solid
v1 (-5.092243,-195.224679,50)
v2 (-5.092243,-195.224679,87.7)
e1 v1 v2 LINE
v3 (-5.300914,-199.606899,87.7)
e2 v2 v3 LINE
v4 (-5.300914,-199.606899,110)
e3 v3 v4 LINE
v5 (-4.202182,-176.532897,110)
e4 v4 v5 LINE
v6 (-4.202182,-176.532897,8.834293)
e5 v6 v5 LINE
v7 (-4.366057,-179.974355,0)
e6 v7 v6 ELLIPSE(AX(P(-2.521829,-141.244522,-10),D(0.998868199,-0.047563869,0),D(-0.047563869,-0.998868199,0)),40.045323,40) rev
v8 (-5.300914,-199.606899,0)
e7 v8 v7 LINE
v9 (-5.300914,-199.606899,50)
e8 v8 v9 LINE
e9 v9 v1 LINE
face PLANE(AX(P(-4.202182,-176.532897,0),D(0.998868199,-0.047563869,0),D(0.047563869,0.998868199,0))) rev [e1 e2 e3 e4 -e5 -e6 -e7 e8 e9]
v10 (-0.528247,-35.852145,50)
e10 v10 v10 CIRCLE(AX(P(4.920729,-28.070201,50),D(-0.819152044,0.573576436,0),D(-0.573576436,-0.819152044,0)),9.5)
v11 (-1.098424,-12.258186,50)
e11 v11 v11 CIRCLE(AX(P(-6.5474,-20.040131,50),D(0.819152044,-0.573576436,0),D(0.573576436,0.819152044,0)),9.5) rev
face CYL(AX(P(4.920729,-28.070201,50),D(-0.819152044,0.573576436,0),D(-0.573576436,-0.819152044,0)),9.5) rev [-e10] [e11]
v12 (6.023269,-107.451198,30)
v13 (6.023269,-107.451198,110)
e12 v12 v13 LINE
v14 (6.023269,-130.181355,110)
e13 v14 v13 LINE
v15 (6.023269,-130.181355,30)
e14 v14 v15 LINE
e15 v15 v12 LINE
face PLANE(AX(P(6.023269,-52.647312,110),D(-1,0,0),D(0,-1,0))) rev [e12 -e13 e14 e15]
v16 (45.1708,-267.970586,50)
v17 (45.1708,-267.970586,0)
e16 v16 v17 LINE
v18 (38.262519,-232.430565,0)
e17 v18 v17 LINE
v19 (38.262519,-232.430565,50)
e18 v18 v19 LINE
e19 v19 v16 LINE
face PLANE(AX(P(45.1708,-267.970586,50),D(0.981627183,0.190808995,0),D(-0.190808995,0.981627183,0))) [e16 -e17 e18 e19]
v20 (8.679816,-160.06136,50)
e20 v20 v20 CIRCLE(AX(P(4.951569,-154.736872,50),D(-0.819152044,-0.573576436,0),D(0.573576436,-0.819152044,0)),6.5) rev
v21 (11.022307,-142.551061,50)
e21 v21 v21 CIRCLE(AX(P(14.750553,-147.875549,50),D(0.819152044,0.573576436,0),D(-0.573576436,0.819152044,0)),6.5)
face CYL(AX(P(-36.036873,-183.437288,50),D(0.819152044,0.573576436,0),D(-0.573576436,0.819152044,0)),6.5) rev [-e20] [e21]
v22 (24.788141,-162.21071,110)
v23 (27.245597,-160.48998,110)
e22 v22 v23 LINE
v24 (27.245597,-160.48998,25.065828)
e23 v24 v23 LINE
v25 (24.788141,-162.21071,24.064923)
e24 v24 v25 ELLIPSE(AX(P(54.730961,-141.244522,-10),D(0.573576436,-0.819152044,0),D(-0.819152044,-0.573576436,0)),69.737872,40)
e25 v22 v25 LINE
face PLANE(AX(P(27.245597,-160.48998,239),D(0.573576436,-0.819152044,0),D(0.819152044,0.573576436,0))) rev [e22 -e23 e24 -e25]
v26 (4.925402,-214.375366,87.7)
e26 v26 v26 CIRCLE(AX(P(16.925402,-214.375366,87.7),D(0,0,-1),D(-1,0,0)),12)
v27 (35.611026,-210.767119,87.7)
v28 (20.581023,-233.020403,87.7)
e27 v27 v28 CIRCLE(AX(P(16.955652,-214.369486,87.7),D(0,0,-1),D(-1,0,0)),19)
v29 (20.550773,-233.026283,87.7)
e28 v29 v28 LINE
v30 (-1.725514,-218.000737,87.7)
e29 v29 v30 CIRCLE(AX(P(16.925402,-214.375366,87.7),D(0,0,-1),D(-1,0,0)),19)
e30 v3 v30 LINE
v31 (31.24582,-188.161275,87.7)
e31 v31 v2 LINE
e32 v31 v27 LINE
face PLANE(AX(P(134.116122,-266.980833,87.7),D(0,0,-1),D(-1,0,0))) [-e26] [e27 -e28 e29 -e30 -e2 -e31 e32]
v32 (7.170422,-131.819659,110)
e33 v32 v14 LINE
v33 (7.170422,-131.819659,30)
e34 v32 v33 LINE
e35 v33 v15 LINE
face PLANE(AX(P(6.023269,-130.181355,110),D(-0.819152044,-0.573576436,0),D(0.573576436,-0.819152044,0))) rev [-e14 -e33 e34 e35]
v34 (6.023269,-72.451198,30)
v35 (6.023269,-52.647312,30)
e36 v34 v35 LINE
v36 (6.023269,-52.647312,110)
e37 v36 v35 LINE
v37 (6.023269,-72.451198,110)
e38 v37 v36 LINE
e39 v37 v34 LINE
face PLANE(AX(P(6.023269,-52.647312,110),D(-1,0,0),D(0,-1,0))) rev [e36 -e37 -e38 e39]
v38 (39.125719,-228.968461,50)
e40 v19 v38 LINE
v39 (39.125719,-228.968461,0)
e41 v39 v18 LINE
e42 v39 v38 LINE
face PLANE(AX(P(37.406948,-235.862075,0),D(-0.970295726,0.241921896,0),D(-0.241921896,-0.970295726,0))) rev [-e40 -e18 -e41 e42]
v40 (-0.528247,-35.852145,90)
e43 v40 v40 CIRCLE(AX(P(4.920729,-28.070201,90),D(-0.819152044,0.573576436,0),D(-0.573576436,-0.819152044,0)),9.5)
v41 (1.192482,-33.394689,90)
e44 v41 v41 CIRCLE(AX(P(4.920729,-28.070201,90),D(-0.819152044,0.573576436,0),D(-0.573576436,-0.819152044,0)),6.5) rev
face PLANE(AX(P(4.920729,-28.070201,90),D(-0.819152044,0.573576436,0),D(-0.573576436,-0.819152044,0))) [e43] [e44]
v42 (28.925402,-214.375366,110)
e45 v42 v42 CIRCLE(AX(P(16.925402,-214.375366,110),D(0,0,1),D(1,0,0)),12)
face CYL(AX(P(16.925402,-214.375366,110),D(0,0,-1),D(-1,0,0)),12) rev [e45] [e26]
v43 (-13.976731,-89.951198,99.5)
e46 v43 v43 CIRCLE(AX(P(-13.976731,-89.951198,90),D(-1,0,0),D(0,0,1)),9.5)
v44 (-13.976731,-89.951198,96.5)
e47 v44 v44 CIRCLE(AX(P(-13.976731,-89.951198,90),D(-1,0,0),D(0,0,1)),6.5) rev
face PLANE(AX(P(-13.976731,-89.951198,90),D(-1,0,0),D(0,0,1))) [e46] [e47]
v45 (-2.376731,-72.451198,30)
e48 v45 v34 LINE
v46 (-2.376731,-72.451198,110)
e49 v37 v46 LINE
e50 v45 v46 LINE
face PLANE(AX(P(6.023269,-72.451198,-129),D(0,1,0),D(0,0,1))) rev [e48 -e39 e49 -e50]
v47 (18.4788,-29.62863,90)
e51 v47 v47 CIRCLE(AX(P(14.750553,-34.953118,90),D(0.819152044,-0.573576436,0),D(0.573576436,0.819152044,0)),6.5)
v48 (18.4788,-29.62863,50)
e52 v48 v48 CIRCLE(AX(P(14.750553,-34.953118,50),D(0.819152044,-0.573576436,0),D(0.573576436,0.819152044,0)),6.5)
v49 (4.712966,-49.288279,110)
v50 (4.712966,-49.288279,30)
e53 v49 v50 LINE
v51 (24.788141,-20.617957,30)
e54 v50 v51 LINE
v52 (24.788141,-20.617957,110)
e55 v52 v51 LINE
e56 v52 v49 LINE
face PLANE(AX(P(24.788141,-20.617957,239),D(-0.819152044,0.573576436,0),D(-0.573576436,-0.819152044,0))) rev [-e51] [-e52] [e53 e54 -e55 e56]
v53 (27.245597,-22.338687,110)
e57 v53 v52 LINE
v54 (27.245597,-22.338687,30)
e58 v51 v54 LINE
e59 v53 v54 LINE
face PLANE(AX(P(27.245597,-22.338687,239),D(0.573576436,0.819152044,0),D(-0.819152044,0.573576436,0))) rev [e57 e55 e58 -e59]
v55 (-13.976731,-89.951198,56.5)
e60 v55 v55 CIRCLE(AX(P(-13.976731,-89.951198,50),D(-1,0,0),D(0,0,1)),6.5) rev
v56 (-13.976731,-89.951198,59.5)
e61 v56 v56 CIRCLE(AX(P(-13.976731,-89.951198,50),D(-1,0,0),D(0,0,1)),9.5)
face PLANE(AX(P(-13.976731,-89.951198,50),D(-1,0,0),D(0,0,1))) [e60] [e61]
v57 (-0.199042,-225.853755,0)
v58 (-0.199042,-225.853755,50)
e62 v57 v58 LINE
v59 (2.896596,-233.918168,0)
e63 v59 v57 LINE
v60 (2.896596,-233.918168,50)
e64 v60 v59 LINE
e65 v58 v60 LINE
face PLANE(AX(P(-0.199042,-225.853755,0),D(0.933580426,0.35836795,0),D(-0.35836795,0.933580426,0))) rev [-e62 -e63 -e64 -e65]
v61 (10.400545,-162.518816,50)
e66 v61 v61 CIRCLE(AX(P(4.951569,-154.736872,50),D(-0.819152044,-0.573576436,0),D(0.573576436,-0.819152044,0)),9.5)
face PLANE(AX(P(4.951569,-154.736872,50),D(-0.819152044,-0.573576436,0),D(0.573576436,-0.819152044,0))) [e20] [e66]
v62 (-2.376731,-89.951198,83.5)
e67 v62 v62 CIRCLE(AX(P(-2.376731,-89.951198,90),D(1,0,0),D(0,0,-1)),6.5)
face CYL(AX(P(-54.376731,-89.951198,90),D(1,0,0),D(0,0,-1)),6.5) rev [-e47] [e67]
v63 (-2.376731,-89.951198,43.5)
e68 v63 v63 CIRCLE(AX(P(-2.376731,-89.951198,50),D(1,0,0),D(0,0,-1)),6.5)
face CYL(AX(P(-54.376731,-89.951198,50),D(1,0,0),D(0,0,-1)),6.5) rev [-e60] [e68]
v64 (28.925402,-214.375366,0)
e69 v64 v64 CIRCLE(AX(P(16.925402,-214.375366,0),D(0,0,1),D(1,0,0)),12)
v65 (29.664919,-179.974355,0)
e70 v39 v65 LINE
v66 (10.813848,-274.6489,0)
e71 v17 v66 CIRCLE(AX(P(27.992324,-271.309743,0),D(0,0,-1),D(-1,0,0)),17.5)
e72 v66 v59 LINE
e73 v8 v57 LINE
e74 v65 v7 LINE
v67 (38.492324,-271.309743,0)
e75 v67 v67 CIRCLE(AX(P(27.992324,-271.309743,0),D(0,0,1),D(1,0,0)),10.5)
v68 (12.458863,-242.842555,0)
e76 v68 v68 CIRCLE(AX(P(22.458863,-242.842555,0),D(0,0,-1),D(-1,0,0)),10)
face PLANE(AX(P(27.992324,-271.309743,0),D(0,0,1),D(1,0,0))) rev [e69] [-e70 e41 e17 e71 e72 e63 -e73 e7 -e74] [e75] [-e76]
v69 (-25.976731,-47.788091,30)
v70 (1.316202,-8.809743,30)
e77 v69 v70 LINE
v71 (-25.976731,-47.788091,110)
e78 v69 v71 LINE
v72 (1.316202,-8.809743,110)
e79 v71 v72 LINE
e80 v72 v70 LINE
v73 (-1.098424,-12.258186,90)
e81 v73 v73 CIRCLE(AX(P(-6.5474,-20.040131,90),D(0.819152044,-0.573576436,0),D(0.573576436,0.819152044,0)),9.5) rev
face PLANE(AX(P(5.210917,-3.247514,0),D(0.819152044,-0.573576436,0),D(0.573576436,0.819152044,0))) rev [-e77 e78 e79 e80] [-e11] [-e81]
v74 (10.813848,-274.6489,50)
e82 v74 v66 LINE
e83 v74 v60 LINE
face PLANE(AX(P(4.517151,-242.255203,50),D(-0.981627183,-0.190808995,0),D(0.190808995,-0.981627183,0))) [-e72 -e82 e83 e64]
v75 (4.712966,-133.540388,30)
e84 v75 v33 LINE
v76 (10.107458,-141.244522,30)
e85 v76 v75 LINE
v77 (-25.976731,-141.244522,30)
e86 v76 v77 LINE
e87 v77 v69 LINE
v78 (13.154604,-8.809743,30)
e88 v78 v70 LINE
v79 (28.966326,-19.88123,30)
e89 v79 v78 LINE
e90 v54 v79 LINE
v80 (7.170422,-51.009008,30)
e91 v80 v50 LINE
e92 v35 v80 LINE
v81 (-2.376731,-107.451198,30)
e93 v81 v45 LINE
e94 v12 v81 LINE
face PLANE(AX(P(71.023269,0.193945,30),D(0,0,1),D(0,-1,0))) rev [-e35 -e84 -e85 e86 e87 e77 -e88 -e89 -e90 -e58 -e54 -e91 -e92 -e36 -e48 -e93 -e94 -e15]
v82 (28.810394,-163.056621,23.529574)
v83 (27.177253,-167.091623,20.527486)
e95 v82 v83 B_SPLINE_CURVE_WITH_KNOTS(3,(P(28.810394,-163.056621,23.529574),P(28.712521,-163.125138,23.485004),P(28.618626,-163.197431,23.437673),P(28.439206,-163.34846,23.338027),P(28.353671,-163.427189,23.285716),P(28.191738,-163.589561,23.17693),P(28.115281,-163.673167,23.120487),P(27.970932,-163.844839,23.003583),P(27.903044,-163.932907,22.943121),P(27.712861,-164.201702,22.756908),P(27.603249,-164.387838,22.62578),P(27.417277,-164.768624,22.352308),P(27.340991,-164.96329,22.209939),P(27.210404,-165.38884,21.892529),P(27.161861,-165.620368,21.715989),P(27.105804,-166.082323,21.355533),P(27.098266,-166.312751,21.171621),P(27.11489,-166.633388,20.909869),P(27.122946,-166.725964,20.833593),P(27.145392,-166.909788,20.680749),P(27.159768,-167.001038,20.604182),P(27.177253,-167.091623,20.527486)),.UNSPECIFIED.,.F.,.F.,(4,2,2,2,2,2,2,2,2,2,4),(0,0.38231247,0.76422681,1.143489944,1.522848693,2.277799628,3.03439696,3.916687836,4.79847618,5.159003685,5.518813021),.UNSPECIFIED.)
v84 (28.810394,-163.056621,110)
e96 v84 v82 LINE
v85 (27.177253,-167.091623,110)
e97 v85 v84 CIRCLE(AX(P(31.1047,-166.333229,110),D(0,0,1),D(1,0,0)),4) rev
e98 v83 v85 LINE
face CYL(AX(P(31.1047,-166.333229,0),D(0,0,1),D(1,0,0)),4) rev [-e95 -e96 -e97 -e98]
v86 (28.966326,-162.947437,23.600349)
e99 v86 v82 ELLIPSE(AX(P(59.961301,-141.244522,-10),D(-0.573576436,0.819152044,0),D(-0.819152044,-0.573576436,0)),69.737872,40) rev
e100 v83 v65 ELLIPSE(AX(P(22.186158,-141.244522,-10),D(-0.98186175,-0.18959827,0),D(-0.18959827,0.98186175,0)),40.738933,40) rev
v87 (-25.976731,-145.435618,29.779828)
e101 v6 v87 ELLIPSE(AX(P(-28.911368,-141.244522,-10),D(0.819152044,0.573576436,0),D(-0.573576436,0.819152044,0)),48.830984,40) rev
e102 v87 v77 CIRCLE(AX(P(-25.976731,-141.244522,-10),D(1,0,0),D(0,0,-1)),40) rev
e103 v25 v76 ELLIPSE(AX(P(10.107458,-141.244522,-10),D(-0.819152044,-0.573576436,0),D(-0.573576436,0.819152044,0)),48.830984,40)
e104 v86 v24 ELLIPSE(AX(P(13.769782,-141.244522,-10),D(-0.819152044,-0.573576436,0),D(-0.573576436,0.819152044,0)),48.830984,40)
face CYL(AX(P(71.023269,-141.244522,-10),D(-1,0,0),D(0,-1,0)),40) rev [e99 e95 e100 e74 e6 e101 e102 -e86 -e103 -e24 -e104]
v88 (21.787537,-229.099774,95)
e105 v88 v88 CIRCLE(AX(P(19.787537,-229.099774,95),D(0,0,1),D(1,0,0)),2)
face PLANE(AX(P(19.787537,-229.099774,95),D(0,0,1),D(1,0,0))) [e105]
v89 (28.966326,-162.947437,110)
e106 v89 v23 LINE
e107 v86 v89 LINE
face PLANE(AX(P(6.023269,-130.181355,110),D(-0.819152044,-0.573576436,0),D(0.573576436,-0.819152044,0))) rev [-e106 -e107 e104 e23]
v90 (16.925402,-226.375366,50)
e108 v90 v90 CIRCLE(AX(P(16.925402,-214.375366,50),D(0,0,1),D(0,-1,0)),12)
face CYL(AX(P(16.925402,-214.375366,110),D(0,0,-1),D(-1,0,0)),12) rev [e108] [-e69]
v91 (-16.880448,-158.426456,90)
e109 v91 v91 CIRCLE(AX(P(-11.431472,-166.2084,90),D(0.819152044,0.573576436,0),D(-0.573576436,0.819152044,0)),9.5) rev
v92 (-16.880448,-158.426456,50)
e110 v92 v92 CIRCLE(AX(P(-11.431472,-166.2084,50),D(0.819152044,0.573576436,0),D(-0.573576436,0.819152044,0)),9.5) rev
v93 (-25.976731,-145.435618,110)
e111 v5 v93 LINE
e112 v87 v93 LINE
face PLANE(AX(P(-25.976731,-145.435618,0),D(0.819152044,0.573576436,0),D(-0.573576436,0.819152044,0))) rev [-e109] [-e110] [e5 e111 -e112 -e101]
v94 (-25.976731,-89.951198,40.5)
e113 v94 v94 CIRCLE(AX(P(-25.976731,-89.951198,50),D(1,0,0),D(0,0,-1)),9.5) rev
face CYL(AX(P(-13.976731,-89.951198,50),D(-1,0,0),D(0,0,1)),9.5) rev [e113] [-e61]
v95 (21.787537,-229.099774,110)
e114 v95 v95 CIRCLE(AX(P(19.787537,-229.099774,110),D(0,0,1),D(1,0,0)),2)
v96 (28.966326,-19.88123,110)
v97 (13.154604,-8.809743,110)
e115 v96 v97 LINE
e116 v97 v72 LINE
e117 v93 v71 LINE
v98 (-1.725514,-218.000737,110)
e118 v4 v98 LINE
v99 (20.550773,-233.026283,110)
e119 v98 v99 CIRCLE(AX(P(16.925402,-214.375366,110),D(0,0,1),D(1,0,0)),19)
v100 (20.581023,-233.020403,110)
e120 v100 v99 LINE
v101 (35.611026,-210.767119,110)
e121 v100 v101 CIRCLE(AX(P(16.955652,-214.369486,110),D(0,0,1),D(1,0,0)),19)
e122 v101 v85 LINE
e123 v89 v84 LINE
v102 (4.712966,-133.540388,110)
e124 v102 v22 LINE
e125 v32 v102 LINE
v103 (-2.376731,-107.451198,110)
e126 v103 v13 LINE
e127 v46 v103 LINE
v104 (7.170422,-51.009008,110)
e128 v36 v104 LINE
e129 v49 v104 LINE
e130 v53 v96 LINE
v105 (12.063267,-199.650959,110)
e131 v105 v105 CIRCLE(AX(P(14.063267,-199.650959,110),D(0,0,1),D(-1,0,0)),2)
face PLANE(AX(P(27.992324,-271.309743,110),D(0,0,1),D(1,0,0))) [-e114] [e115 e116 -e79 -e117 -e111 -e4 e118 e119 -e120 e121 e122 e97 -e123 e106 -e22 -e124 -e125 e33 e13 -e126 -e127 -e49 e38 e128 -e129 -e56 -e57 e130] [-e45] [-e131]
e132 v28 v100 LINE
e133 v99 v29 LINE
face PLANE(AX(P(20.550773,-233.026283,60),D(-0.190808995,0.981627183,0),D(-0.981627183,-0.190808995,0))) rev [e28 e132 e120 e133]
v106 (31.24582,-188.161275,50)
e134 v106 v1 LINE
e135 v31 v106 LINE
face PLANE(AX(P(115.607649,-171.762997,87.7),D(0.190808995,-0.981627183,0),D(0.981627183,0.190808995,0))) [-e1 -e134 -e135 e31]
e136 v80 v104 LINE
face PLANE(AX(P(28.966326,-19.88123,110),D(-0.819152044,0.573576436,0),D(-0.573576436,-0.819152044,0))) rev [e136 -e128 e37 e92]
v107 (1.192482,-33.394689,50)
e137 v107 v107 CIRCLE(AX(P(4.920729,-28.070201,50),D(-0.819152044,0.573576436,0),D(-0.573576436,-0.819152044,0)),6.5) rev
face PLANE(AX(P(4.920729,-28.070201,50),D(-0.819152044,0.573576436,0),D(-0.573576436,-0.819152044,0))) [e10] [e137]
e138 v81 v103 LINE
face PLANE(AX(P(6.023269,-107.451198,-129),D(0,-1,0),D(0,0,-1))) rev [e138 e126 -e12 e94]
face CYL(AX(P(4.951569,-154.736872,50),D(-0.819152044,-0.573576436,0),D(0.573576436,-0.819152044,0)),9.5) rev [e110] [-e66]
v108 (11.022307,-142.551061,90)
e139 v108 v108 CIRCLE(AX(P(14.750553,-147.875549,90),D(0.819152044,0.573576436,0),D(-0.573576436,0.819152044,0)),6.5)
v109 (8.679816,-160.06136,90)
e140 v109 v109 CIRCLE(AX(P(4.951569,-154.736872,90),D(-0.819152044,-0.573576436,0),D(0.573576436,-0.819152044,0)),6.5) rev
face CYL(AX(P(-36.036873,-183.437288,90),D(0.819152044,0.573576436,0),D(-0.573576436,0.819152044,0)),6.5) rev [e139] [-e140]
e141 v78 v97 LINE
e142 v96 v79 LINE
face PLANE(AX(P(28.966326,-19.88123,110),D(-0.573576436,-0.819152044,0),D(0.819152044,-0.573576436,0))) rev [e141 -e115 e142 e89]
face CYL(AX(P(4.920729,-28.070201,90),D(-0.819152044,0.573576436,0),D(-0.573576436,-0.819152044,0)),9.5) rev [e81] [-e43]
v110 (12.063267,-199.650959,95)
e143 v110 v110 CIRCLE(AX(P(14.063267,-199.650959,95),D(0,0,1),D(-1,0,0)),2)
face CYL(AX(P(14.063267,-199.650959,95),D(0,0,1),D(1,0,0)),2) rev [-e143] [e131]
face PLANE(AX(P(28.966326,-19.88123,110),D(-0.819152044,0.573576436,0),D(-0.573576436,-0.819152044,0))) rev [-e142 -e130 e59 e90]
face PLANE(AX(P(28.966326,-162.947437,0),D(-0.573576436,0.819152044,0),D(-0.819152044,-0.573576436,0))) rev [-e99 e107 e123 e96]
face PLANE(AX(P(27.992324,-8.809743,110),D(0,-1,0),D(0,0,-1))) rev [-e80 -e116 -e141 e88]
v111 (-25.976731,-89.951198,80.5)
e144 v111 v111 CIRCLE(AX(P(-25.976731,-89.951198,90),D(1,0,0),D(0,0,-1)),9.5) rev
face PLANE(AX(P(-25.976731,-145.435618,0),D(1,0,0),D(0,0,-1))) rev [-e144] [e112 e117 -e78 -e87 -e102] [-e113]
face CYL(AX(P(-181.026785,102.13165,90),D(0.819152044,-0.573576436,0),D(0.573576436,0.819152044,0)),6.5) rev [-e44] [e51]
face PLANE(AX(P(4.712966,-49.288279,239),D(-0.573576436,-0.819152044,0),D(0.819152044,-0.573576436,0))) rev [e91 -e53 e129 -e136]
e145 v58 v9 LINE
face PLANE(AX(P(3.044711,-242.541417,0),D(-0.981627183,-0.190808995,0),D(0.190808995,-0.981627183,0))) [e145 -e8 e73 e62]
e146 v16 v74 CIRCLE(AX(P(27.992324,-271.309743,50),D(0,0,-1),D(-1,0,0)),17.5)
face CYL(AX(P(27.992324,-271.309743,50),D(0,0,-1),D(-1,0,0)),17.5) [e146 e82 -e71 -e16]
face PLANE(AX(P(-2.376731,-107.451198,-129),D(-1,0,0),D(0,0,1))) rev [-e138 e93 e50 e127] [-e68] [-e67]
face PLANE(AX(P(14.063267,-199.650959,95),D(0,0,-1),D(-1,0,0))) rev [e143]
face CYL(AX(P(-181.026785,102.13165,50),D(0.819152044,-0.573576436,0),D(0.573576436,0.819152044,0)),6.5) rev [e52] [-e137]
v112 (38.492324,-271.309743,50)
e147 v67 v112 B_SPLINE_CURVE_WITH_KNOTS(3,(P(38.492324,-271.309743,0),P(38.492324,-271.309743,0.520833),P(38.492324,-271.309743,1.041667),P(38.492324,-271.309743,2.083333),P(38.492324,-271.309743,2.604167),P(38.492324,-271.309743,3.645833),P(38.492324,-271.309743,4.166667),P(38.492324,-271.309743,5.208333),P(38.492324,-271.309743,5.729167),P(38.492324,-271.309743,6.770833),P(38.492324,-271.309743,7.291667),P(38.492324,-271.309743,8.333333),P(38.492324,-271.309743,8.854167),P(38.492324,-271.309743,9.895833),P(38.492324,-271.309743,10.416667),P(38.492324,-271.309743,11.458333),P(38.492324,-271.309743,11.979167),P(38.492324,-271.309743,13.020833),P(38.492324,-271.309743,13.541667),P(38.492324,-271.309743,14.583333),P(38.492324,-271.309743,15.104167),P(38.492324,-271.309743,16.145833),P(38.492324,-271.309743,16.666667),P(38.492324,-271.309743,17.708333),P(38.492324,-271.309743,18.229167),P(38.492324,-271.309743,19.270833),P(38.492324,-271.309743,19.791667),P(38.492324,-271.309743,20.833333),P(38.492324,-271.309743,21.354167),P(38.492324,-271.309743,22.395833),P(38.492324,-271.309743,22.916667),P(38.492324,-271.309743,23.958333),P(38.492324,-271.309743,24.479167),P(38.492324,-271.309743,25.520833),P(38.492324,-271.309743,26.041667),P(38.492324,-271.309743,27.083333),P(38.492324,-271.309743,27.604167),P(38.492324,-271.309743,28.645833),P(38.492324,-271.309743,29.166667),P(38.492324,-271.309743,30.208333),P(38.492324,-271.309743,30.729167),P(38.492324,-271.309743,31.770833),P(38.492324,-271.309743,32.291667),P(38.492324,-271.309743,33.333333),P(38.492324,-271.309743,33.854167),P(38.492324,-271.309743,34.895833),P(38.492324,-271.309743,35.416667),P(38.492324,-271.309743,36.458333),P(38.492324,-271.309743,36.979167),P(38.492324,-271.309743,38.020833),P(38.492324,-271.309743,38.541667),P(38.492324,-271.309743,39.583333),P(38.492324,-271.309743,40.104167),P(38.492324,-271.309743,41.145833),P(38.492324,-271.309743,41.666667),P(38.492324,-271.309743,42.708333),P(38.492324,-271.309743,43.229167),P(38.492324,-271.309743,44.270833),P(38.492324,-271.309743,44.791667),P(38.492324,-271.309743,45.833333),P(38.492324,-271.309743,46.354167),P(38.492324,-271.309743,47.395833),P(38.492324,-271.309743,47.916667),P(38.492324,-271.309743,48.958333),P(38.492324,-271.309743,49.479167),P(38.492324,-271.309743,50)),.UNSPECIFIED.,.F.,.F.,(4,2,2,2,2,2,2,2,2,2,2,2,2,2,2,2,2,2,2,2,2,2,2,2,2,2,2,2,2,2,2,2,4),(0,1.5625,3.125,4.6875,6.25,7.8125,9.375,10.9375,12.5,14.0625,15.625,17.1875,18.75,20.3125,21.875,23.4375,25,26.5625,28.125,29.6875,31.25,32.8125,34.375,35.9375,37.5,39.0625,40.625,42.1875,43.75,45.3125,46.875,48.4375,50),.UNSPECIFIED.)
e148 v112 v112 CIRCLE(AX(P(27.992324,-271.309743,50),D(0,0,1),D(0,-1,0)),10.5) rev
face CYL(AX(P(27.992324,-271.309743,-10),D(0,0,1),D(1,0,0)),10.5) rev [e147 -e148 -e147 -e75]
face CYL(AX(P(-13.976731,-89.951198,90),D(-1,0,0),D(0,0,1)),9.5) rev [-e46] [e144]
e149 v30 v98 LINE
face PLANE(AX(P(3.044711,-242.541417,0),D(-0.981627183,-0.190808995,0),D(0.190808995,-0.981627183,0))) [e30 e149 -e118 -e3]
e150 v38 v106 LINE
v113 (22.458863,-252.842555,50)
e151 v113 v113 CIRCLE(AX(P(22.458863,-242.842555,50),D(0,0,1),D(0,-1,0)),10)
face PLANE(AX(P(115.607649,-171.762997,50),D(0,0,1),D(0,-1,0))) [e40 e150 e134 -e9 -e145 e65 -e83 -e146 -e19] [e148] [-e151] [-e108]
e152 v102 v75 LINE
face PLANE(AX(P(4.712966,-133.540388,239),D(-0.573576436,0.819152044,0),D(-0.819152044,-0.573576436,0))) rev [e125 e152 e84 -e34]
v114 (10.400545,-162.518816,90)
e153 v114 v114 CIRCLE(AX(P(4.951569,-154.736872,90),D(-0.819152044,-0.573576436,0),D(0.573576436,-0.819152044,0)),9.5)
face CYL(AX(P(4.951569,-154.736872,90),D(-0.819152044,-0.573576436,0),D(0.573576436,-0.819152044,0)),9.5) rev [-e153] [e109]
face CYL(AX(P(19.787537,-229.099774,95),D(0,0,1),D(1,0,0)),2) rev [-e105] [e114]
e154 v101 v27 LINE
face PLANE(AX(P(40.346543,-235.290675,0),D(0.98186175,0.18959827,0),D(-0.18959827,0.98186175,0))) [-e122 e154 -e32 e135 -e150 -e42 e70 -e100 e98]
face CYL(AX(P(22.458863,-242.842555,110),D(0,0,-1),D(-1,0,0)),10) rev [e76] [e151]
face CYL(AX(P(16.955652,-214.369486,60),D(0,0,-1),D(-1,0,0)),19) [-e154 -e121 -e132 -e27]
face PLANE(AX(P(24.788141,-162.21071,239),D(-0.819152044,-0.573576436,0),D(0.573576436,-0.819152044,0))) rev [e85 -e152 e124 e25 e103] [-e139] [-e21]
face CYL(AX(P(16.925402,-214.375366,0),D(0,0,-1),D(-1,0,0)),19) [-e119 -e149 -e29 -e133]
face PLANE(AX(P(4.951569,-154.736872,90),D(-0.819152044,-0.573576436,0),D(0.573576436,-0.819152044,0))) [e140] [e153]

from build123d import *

# Parameters (mm, degrees)
SKETCH_1_R                = 12.000000000000052
EXTRUDE_1_DEPTH           = 110
SKETCH_79_R               = 10.500000000000002
CUT_EXTRUDE_45_DEPTH      = 119.99999999999999
EXTRUDE_2_DEPTH           = 110
CUT_EXTRUDE_46_DEPTH      = 89
CUT_EXTRUDE_46_DEPTH_BACK = 89
CUT_EXTRUDE_48_DEPTH      = 239.00000000000009
CUT_EXTRUDE_49_DEPTH      = 239.00000000000009
SKETCH_93_R               = 6.500000000000002
SKETCH_93_R_2             = 6.500000000000001
CUT_EXTRUDE_50_DEPTH      = 239.00000000000009
SKETCH_94_R               = 9.499999999999995
SKETCH_94_R_2             = 9.500000000000002
CUT_EXTRUDE_51_DEPTH      = 20
SKETCH_95_R               = 6.500000000000003
CUT_EXTRUDE_52_DEPTH      = 62.00000000000001
SKETCH_96_R               = 9.50000000000001
CUT_EXTRUDE_53_DEPTH      = 26
SKETCH_97_R               = 6.500000000000003
CUT_EXTRUDE_54_DEPTH      = 52.00000000000001
CUT_EXTRUDE_56_DEPTH      = 30
CHAMFER_1_SIZE            = 15
CHAMFER_1_SIZE2           = 6.994614872324999
CHAMFER_2_SIZE            = 17
CHAMFER_2_SIZE2           = 2.99755867204391
CUT_EXTRUDE_57_DEPTH      = 99.99999999999999
CUT_EXTRUDE_61_DEPTH      = 311.8166526922088
CUT_EXTRUDE_62_DEPTH      = 50
FILLET_3_R                = 19
EXTRUDE_3_DEPTH           = 50
SKETCH_107_R              = 2.0000000000000036
SKETCH_107_R_2            = 2.0000000000000027
CUT_EXTRUDE_63_DEPTH      = 15
EXTRUDE_4_DEPTH           = 80
SKETCH_109_R              = 6.500000000000003
CUT_EXTRUDE_64_DEPTH      = 80
SKETCH_110_R              = 9.5
SKETCH_110_R_2            = 9.499999999999993
CUT_EXTRUDE_65_DEPTH      = 18
FILLET_5_R                = 40
CUT_EXTRUDE_66_DEPTH      = 313.378967275511
CUT_EXTRUDE_67_DEPTH      = 313.378967275511
SKETCH_113_R              = 10.000000000000004
CUT_EXTRUDE_68_DEPTH      = 313.378967275511
CUT_EXTRUDE_69_DEPTH      = 304.118160452512
CUT_EXTRUDE_70_DEPTH      = 313.378967275511
FILLET_6_R                = 4


with BuildPart() as part:
    # 草图1 → 拉伸1 (new body)
    with BuildSketch(Plane.XY):
        with BuildLine():
            Line((-28.976730988546294, -151.6118545806237), (-4.886520661802549, -186.0162404407615))
            Line((-4.886520661802549, -186.0162404407615), (12.286288922085955, -274.3626869510514))
            ThreePointArc((12.286288922085955, -274.3626869510514), (31.04526778327322, -287.0157779601894), (43.69835879241124, -268.25679909900214))
            Line((43.69835879241124, -268.25679909900214), (21.02326901145373, -151.6035749038858))
            Line((21.02326901145373, -151.6035749038858), (6.0232690114537295, -130.18135480275456))
            Line((6.0232690114537295, -130.18135480275456), (6.023269011453701, -52.647312191388025))
            Line((6.023269011453701, -52.647312191388025), (28.96632646549536, -19.88123041982822))
            Line((28.96632646549536, -19.88123041982822), (0.2960049153805317, 0.19394485245823218))
            Line((0.2960049153805317, 0.19394485245823218), (-28.976730988546297, -41.61185458062371))
            Line((-28.976730988546297, -41.61185458062371), (-28.976730988546294, -151.6118545806237))
        make_face()
        with Locations((16.925402125409377, -214.37536638506216)):
            Circle(SKETCH_1_R, mode=Mode.SUBTRACT)
    extrude(amount=EXTRUDE_1_DEPTH)

    # 草图79 → 切除-拉伸45 (cut)
    with BuildSketch(Plane.XY.offset(110)):
        with Locations((27.992323857248596, -271.30974302502676)):
            Circle(SKETCH_79_R)
    extrude(amount=-CUT_EXTRUDE_45_DEPTH, mode=Mode.SUBTRACT)

    # 草图84 → 拉伸2 (add)
    with BuildSketch(Plane.XY.offset(110)):
        Polygon((33.778866566137545, -180.53953408076273), (44.27305222911856, -234.52743907759367), (37.4016619449849, -235.8631020452294), (21.02326901145373, -151.6035749038858), (30.894607438439245, -165.70130720226237), align=None)
        Polygon((5.989592074660172, -241.96898989727845), (3.0447105243171766, -242.54141688340806), (-9.117094273367561, -179.974355170029), (-4.886520661802549, -186.0162404407615), (-4.1690194468529445, -189.7074641975933), align=None)
    extrude(amount=-EXTRUDE_2_DEPTH)

    # 草图87 → 切除-拉伸46 (cut, two sides: drawn at the far end of the back side and taken through both)
    with BuildSketch(Plane(origin=(-8.137997067664443, -1.5818663857744057, 0), x_dir=(0, 0, -1), z_dir=(0.9816271834476652, 0.1908089953765384, 0)).offset(-CUT_EXTRUDE_46_DEPTH_BACK)):
        Polygon((-87.7, -287.6662060810232), (-87.7, -190.66620608102318), (-49.99999999999997, -190.66620608102318), (-49.999999999999964, -287.6662060810232), align=None)
    extrude(amount=CUT_EXTRUDE_46_DEPTH + CUT_EXTRUDE_46_DEPTH_BACK, mode=Mode.SUBTRACT)

    # 草图91 → 切除-拉伸48 (cut)
    with BuildSketch(Plane(origin=(0, 0, 0), x_dir=(-1, 0, 0), z_dir=(0, 0, -1))):
        Polygon((-27.245597156442233, -22.338686552695204), (-24.78814102357525, -20.61795724364208), (-4.712965751288797, -49.288278793756916), (-7.17042188415578, -51.00900810281004), align=None)
        Polygon((-7.1704218841557825, -131.81965889133255), (-27.24559715644222, -160.48998044144736), (-24.788141023575246, -162.21070975050048), (-4.712965751288817, -133.54038820038565), align=None)
    extrude(amount=-CUT_EXTRUDE_48_DEPTH, mode=Mode.SUBTRACT)

    # 草图92 → 切除-拉伸49 (cut)
    with BuildSketch(Plane.XY.offset(110)):
        Polygon((6.0232690114537295, -72.45119809723869), (-2.3767309885462713, -72.45119809723869), (-2.3767309885462713, -107.45119809723869), (6.023269011453735, -107.45119809723869), align=None)
    extrude(amount=-CUT_EXTRUDE_49_DEPTH, mode=Mode.SUBTRACT)

    # 草图93 → 切除-拉伸50 (cut)
    with BuildSketch(Plane(origin=(26.320363423382695, -18.42971687747145, 0), x_dir=(0, 0, -1), z_dir=(0.819152044288995, -0.5735764363510417, 0))):
        with Locations(Location((-90, -20.171348233123165, 0), (0, 0, 90))):
            Circle(SKETCH_93_R)
        with Locations(Location((-49.99999999999999, -20.171348233123165, 0), (0, 0, 90))):
            Circle(SKETCH_93_R_2)
    extrude(amount=-CUT_EXTRUDE_50_DEPTH, mode=Mode.SUBTRACT)

    # 草图94 → 切除-拉伸51 (cut)
    with BuildSketch(Plane(origin=(0.1074980061348375, -0.07527091423812592, 0), x_dir=(0, 0, 1), z_dir=(-0.819152044288995, 0.5735764363510416, 0))):
        with Locations(Location((90, -20.171348233123137, 0), (0, 0, 270))):
            Circle(SKETCH_94_R)
        with Locations(Location((49.99999999999999, -20.171348233123467, 0), (0, 0, 270))):
            Circle(SKETCH_94_R_2)
    extrude(amount=-CUT_EXTRUDE_51_DEPTH, mode=Mode.SUBTRACT)

    # 草图95 → 切除-拉伸52 (cut)
    with BuildSketch(Plane(origin=(-59.581011197876926, -41.71907317491002, 0), x_dir=(0, 0, -1), z_dir=(0.8191520442889946, 0.5735764363510422, 0))):
        with Locations(Location((-90, -129.59312808976065, 0), (0, 0, 90))):
            Circle(SKETCH_95_R)
        with Locations(Location((-49.99999999999999, -129.59312808976065, 0), (0, 0, 90))):
            Circle(SKETCH_95_R)
    extrude(amount=-CUT_EXTRUDE_52_DEPTH, mode=Mode.SUBTRACT)

    # 草图96 → 切除-拉伸53 (cut)
    with BuildSketch(Plane(origin=(-90.67794882371814, -63.493383315761, 0), x_dir=(0, 0, 1), z_dir=(-0.819152044288995, -0.5735764363510415, 0))):
        with Locations(Location((90, -129.59312808976048, 0), (0, 0, 270))):
            Circle(SKETCH_96_R)
        with Locations(Location((49.99999999999999, -129.59312808976048, 0), (0, 0, 270))):
            Circle(SKETCH_96_R)
    extrude(amount=-CUT_EXTRUDE_53_DEPTH, mode=Mode.SUBTRACT)

    # 草图97 → 切除-拉伸54 (cut)
    with BuildSketch(Plane(origin=(-2.3767309885462713, 0, 0), x_dir=(0, 0, -1), z_dir=(1, 0, 0))):
        with Locations((-90, -89.95119809723869)):
            Circle(SKETCH_97_R)
        with Locations((-49.99999999999999, -89.95119809723869)):
            Circle(SKETCH_97_R)
    extrude(amount=-CUT_EXTRUDE_54_DEPTH, mode=Mode.SUBTRACT)

    # 草图99 → 切除-拉伸56 (cut)
    with BuildSketch(Plane.XY.offset(110)):
        Polygon((2.8366871656253227, -242.58185252817833), (50.557361432229264, -233.30589311197602), (61.540376104596135, -289.8086053521652), (8.071539904446078, -294.7746451108994), align=None)
    extrude(amount=-CUT_EXTRUDE_56_DEPTH, mode=Mode.SUBTRACT)

    # 倒角1
    chamfer_1_edges = [part.edges().sort_by_distance(p)[0] for p in [
        (44.27305222911856, -234.52743907759367, 24.999999999999986),
    ]]
    chamfer_1_side = [part.faces().sort_by_distance(p)[0] for p in [
        (44.02415054875298, -233.24695093828703, 98.85),
    ]]
    chamfer(chamfer_1_edges, length=CHAMFER_1_SIZE, length2=CHAMFER_1_SIZE2, reference=chamfer_1_side[0])

    # 倒角2
    chamfer_2_edges = [part.edges().sort_by_distance(p)[0] for p in [
        (3.0447105243171766, -242.54141688340806, 24.999999999999986),
    ]]
    chamfer_2_side = [part.faces().sort_by_distance(p)[0] for p in [
        (-3.0361918745251923, -211.25788602671855, 108.72867994952558),
    ]]
    chamfer(chamfer_2_edges, length=CHAMFER_2_SIZE, length2=CHAMFER_2_SIZE2, reference=chamfer_2_side[0])

    # 草图100 → 切除-拉伸57 (cut)
    with BuildSketch(Plane.ZY.offset(28.976730988546297)):
        Polygon((0, 0.19394485245823218), (30, 0.19394485245823218), (30.00000000000002, -179.974355170029), (0, -179.974355170029), align=None)
    extrude(amount=-CUT_EXTRUDE_57_DEPTH, mode=Mode.SUBTRACT)

    # 草图103 → 切除-拉伸61 (cut, through all)
    with BuildSketch(Plane.XY.offset(110)):
        Polygon((44.27305222911856, -234.52743907759367), (40.34654349532844, -235.2906750590997), (32.288610890773896, -193.56151895418722), (28.966326465495865, -162.94743657431397), (30.894607438439245, -165.70130720226237), align=None)
    extrude(amount=-CUT_EXTRUDE_61_DEPTH, mode=Mode.SUBTRACT)

    # 草图104 → 切除-拉伸62 (cut)
    with BuildSketch(Plane.XY.offset(110)):
        Polygon((20.55077303756356, -233.02628287056783), (39.20895300997954, -229.3995000795826), (40.34654349532844, -235.2906750590997), (3.0447105243171766, -242.54141688340806), (1.899856552057948, -236.65165378272198), align=None)
    extrude(amount=-CUT_EXTRUDE_62_DEPTH, mode=Mode.SUBTRACT)

    # 圆角3
    fillet_3_edges = [part.edges().sort_by_distance(p)[0] for p in [
        (39.20895300997954, -229.3995000795826, 98.85),
        (1.899856552057948, -236.65165378272198, 98.85),
    ]]
    fillet(fillet_3_edges, radius=FILLET_3_R)

    # 草图105 → 拉伸3 (add)
    with BuildSketch(Plane(origin=(0, 0, 0), x_dir=(-1, 0, 0), z_dir=(0, 0, -1))):
        with BuildLine():
            Line((-5.989592074660172, -241.96898989727845), (-12.286288922085959, -274.36268695105144))
            ThreePointArc((-12.286288922085959, -274.36268695105144), (-31.045267783273285, -287.0157779601894), (-43.69835879241124, -268.2567990990021))
            Line((-43.69835879241124, -268.2567990990021), (-37.401661944984895, -235.86310204522937))
            Line((-37.401661944984895, -235.86310204522937), (-38.26160282801645, -232.42584977227457))
            Line((-38.26160282801645, -232.42584977227457), (-38.87410272015639, -235.57688855216452))
            Line((-38.87410272015639, -235.57688855216452), (-45.17079956758273, -267.9705856059373))
            ThreePointArc((-45.17079956758273, -267.9705856059373), (-31.33148127633808, -288.4882187353609), (-10.813848146914461, -274.64890044411624))
            Line((-10.813848146914461, -274.64890044411624), (-4.517151299488675, -242.25520339034327))
            Line((-4.517151299488675, -242.25520339034327), (-2.8953187153952267, -233.91159805661354))
            Line((-2.8953187153952267, -233.91159805661354), (-5.989592074660172, -241.96898989727845))
        make_face()
    extrude(amount=-EXTRUDE_3_DEPTH)

    # 草图107 → 切除-拉伸63 (cut)
    with BuildSketch(Plane.XY.offset(110)):
        with Locations((19.787537056057417, -229.09977413677714)):
            Circle(SKETCH_107_R)
        with Locations(Location((14.063267194761325, -199.65095863334716, 0), (0, 0, 180))):
            Circle(SKETCH_107_R_2)
    extrude(amount=-CUT_EXTRUDE_63_DEPTH, mode=Mode.SUBTRACT)

    # 草图108 → 拉伸4 (add)
    with BuildSketch(Plane(origin=(0, 3.47e-15, 30), x_dir=(-1, 0, 0), z_dir=(0, -1.2e-16, -1))):
        Polygon((28.976730988546297, -41.6118545806237), (31.976730988546283, -45.896298600850045), (31.976730988546283, -147.32741056039734), (28.97673098854629, -151.6118545806237), align=None)
    extrude(amount=-EXTRUDE_4_DEPTH)

    # 草图109 → 切除-拉伸64 (cut)
    with BuildSketch(Plane(origin=(-2.3767309885462713, 0, 0), x_dir=(0, 0, -1), z_dir=(1, 0, 0))):
        with Locations((-90, -89.95119809723869)):
            Circle(SKETCH_109_R)
        with Locations((-49.99999999999999, -89.95119809723869)):
            Circle(SKETCH_109_R)
    extrude(amount=-CUT_EXTRUDE_64_DEPTH, mode=Mode.SUBTRACT)

    # 草图110 → 切除-拉伸65 (cut)
    with BuildSketch(Plane.ZY.offset(31.976730988546283)):
        with Locations((49.99999999999999, -89.95119809723869)):
            Circle(SKETCH_110_R)
        with Locations((90, -89.95119809723869)):
            Circle(SKETCH_110_R_2)
    extrude(amount=-CUT_EXTRUDE_65_DEPTH, mode=Mode.SUBTRACT)

    # 圆角5
    # the kernel refuses this fillet: 40 mm, written as the material it adds along each edge
    with BuildSketch(Plane(origin=(-105.941677928553, -179.974355170029, 30.00000000000002), x_dir=(0, 0, -1), z_dir=(1, 3e-17, 0))) as fillet_5_piece_1_section:
        with BuildLine():
            CenterArc((40, 38.72983346207417), FILLET_5_R, 180, 75.52248781407013)
            Line((3.55e-15, 38.72983346207417), (-0.7999999999999972, 38.72983346207417))
            Line((-0.7999999999999972, 38.72983346207417), (-0.8000000000000007, 0))
            Line((-0.8000000000000007, 0), (0, -0.8000000000000114))
            ThreePointArc((0, -0.8000000000000114), (15.00000000000001, -0.8000000000000114), (29.80000000000002, -0.7745966692414754))
            Line((29.80000000000002, -0.7745966692414754), (30.00000000000002, 0))
        make_face()
    fillet_5_piece_1 = extrude(amount=233.58037384137717, mode=Mode.PRIVATE)
    fillet_5_piece_1 = split(fillet_5_piece_1, bisect_by=Plane(origin=(-12.519533294924203, -162.47032383758483, 26.16807715627391), z_dir=(-0.9816271834476658, -0.19080899537653587, 0)), keep=Keep.TOP, mode=Mode.PRIVATE)
    fillet_5_piece_1 = split(fillet_5_piece_1, bisect_by=Plane(origin=(-19.41668158240475, -165.26502008436105, 26.168077156273903), z_dir=(0.8191520442889951, 0.5735764363510417, 0)), keep=Keep.TOP, mode=Mode.PRIVATE)
    fillet_5_piece_1 = split(fillet_5_piece_1, bisect_by=Plane(origin=(-31.976730988546283, -163.25223744066852, 26.168077156273903), z_dir=(1, 0, 0)), keep=Keep.TOP, mode=Mode.PRIVATE)
    add(fillet_5_piece_1)
    with BuildSketch(Plane(origin=(-105.941677928553, -179.974355170029, 30.00000000000002), x_dir=(0, 0, -1), z_dir=(1, 3e-17, 0))) as fillet_5_piece_2_section:
        with BuildLine():
            CenterArc((40, 38.72983346207417), FILLET_5_R, 180, 75.52248781407013)
            Line((3.55e-15, 38.72983346207417), (-0.7999999999999972, 38.72983346207417))
            Line((-0.7999999999999972, 38.72983346207417), (-0.8000000000000007, 0))
            Line((-0.8000000000000007, 0), (0, -0.8000000000000114))
            ThreePointArc((0, -0.8000000000000114), (15.00000000000001, -0.8000000000000114), (29.80000000000002, -0.7745966692414754))
            Line((29.80000000000002, -0.7745966692414754), (30.00000000000002, 0))
        make_face()
    fillet_5_piece_2 = extrude(amount=233.58037384137717, mode=Mode.PRIVATE)
    fillet_5_piece_2 = split(fillet_5_piece_2, bisect_by=Plane(origin=(-11.082360156329408, -169.86393867938773, 24.326706543866806), z_dir=(0.9816271834476658, 0.19080899537653587, 0)), keep=Keep.TOP, mode=Mode.PRIVATE)
    fillet_5_piece_2 = split(fillet_5_piece_2, bisect_by=Plane(origin=(-11.613613613415133, -176.40895605074695, 24.326706543866813), z_dir=(0.8191520442889951, 0.5735764363510417, 0)), keep=Keep.TOP, mode=Mode.PRIVATE)
    fillet_5_piece_2 = split(fillet_5_piece_2, bisect_by=Plane(origin=(6.42628721668682, -175.06781820158835, 24.326706543866813), z_dir=(-0.5735764363510439, 0.8191520442889935, 0)), keep=Keep.TOP, mode=Mode.PRIVATE)
    fillet_5_piece_2 = split(fillet_5_piece_2, bisect_by=Plane(origin=(19.48332401242609, -154.63464590989605, 24.326706543866813), z_dir=(-0.8191520442889955, -0.5735764363510409, 0)), keep=Keep.TOP, mode=Mode.PRIVATE)
    add(fillet_5_piece_2)
    with BuildSketch(Plane(origin=(-105.941677928553, -179.974355170029, 30.00000000000002), x_dir=(0, 0, -1), z_dir=(1, 3e-17, 0))) as fillet_5_piece_3_section:
        with BuildLine():
            CenterArc((40, 38.72983346207417), FILLET_5_R, 180, 75.52248781407013)
            Line((3.55e-15, 38.72983346207417), (-0.7999999999999972, 38.72983346207417))
            Line((-0.7999999999999972, 38.72983346207417), (-0.8000000000000007, 0))
            Line((-0.8000000000000007, 0), (0, -0.8000000000000114))
            ThreePointArc((0, -0.8000000000000114), (15.00000000000001, -0.8000000000000114), (29.80000000000002, -0.7745966692414754))
            Line((29.80000000000002, -0.7745966692414754), (30.00000000000002, 0))
        make_face()
    fillet_5_piece_3 = extrude(amount=233.58037384137717, mode=Mode.PRIVATE)
    fillet_5_piece_3 = split(fillet_5_piece_3, bisect_by=Plane(origin=(-9.009356536559634, -180.5286177765958, 15.359793017612816), z_dir=(0.9816271834476658, 0.19080899537653587, 0)), keep=Keep.TOP, mode=Mode.PRIVATE)
    fillet_5_piece_3 = split(fillet_5_piece_3, bisect_by=Plane(origin=(-8.790580858051872, -180.44066465328672, 15.359793017612818), z_dir=(-0.8191520442889951, -0.5735764363510417, 0)), keep=Keep.TOP, mode=Mode.PRIVATE)
    add(fillet_5_piece_3)
    with BuildSketch(Plane(origin=(-105.941677928553, -179.974355170029, 30.00000000000002), x_dir=(0, 0, -1), z_dir=(1, 3e-17, 0))) as fillet_5_piece_4_section:
        with BuildLine():
            CenterArc((40, 38.72983346207417), FILLET_5_R, 180, 75.52248781407013)
            Line((3.55e-15, 38.72983346207417), (-0.7999999999999972, 38.72983346207417))
            Line((-0.7999999999999972, 38.72983346207417), (-0.8000000000000007, 0))
            Line((-0.8000000000000007, 0), (0, -0.8000000000000114))
            ThreePointArc((0, -0.8000000000000114), (15.00000000000001, -0.8000000000000114), (29.80000000000002, -0.7745966692414754))
            Line((29.80000000000002, -0.7745966692414754), (30.00000000000002, 0))
        make_face()
    fillet_5_piece_4 = extrude(amount=233.58037384137717, mode=Mode.PRIVATE)
    fillet_5_piece_4 = split(fillet_5_piece_4, bisect_by=Plane(origin=(30.21304795631305, -174.43568668746965, 19.796073146276427), z_dir=(-0.9941630536657426, -0.10788801011236512, 0)), keep=Keep.TOP, mode=Mode.PRIVATE)
    fillet_5_piece_4 = split(fillet_5_piece_4, bisect_by=Plane(origin=(13.747414080736915, -169.94150998319088, 19.796073146276424), z_dir=(0.5735764363510439, -0.8191520442889935, 0)), keep=Keep.TOP, mode=Mode.PRIVATE)
    fillet_5_piece_4 = split(fillet_5_piece_4, bisect_by=Plane(origin=(28.87558550635858, -168.04818544125663, 19.796073146276424), z_dir=(-0.8191520442889955, -0.5735764363510409, 0)), keep=Keep.TOP, mode=Mode.PRIVATE)
    add(fillet_5_piece_4)
    with BuildSketch(Plane(origin=(-105.941677928553, -179.974355170029, 30.00000000000002), x_dir=(0, 0, -1), z_dir=(1, 3e-17, 0))) as fillet_5_piece_5_section:
        with BuildLine():
            CenterArc((40, 38.72983346207417), FILLET_5_R, 180, 75.52248781407013)
            Line((3.55e-15, 38.72983346207417), (-0.7999999999999972, 38.72983346207417))
            Line((-0.7999999999999972, 38.72983346207417), (-0.8000000000000007, 0))
            Line((-0.8000000000000007, 0), (0, -0.8000000000000114))
            ThreePointArc((0, -0.8000000000000114), (15.00000000000001, -0.8000000000000114), (29.80000000000002, -0.7745966692414754))
            Line((29.80000000000002, -0.7745966692414754), (30.00000000000002, 0))
        make_face()
    fillet_5_piece_5 = extrude(amount=233.58037384137717, mode=Mode.PRIVATE)
    fillet_5_piece_5 = split(fillet_5_piece_5, bisect_by=Plane(origin=(29.09882687348008, -164.1683971803753, 26.693876526491778), z_dir=(-0.9941630536657426, -0.10788801011236512, 0)), keep=Keep.TOP, mode=Mode.PRIVATE)
    fillet_5_piece_5 = split(fillet_5_piece_5, bisect_by=Plane(origin=(29.196430855580385, -163.27605970035572, 26.69387652649177), z_dir=(-0.8191520442889858, -0.5735764363510547, 0)), keep=Keep.TOP, mode=Mode.PRIVATE)
    fillet_5_piece_5 = split(fillet_5_piece_5, bisect_by=Plane(origin=(25.755372249163997, -161.53344715515144, 26.69387652649177), z_dir=(0.5735764363510439, -0.8191520442889935, 0)), keep=Keep.TOP, mode=Mode.PRIVATE)
    fillet_5_piece_5 = split(fillet_5_piece_5, bisect_by=Plane(origin=(26.73897472271284, -164.9967890094092, 26.69387652649177), z_dir=(0.8191520442889955, 0.5735764363510409, 0)), keep=Keep.TOP, mode=Mode.PRIVATE)
    add(fillet_5_piece_5)

    # 草图111 → 切除-拉伸66 (cut, through all)
    with BuildSketch(Plane.XY.offset(110)):
        Polygon((5.2109171811145, -3.247513765648018), (-25.976730988546283, -47.788091334123926), (-25.976730988546283, -145.43561782712345), (-4.202182007633594, -176.5328965519228), (-9.117094273367561, -179.974355170029), (-31.976730988546283, -147.32741056039734), (-31.976730988546283, -45.89629860085004), (0.2960049153805317, 0.19394485245823218), align=None)
    extrude(amount=-CUT_EXTRUDE_66_DEPTH, mode=Mode.SUBTRACT)

    # 草图112 → 切除-拉伸67 (cut, through all)
    with BuildSketch(Plane.XY.offset(110)):
        Polygon((-4.202182007633594, -176.5328965519228), (-5.300914365836842, -199.60689883898235), (-9.117094273367561, -179.974355170029), align=None)
    extrude(amount=-CUT_EXTRUDE_67_DEPTH, mode=Mode.SUBTRACT)

    # 草图113 → 切除-拉伸68 (cut, through all)
    with BuildSketch(Plane(origin=(0, 0, 0), x_dir=(-1, 0, 0), z_dir=(0, 0, -1))):
        with Locations((-22.45886299132899, -242.84255470504445)):
            Circle(SKETCH_113_R)
    extrude(amount=-CUT_EXTRUDE_68_DEPTH, mode=Mode.SUBTRACT)

    # 草图114 → 切除-拉伸69 (cut, through all)
    with BuildSketch(Plane(origin=(0, 3.47e-15, 30), x_dir=(-1, 0, 0), z_dir=(0, -1.2e-16, -1))):
        Polygon((-27.992323857248415, -8.809743025026684), (8.806750738436506, -8.809743025026684), (3.633058001479367, 5.847577984943226), align=None)
    extrude(amount=-CUT_EXTRUDE_69_DEPTH, mode=Mode.SUBTRACT)

    # 草图115 → 切除-拉伸70 (cut, through all)
    with BuildSketch(Plane.XY.offset(110)):
        Polygon((32.288610890773896, -193.56151895418722), (26.685411611572967, -164.54455034904527), (28.966326465495865, -162.94743657431397), align=None)
    extrude(amount=-CUT_EXTRUDE_70_DEPTH, mode=Mode.SUBTRACT)

    # 圆角6
    fillet_6_edges = [part.edges().sort_by_distance(p)[0] for p in [
        (26.685411611572967, -164.54455034904527, 66.25660377603798),
    ]]
    fillet(fillet_6_edges, radius=FILLET_6_R)


solid = part.part
